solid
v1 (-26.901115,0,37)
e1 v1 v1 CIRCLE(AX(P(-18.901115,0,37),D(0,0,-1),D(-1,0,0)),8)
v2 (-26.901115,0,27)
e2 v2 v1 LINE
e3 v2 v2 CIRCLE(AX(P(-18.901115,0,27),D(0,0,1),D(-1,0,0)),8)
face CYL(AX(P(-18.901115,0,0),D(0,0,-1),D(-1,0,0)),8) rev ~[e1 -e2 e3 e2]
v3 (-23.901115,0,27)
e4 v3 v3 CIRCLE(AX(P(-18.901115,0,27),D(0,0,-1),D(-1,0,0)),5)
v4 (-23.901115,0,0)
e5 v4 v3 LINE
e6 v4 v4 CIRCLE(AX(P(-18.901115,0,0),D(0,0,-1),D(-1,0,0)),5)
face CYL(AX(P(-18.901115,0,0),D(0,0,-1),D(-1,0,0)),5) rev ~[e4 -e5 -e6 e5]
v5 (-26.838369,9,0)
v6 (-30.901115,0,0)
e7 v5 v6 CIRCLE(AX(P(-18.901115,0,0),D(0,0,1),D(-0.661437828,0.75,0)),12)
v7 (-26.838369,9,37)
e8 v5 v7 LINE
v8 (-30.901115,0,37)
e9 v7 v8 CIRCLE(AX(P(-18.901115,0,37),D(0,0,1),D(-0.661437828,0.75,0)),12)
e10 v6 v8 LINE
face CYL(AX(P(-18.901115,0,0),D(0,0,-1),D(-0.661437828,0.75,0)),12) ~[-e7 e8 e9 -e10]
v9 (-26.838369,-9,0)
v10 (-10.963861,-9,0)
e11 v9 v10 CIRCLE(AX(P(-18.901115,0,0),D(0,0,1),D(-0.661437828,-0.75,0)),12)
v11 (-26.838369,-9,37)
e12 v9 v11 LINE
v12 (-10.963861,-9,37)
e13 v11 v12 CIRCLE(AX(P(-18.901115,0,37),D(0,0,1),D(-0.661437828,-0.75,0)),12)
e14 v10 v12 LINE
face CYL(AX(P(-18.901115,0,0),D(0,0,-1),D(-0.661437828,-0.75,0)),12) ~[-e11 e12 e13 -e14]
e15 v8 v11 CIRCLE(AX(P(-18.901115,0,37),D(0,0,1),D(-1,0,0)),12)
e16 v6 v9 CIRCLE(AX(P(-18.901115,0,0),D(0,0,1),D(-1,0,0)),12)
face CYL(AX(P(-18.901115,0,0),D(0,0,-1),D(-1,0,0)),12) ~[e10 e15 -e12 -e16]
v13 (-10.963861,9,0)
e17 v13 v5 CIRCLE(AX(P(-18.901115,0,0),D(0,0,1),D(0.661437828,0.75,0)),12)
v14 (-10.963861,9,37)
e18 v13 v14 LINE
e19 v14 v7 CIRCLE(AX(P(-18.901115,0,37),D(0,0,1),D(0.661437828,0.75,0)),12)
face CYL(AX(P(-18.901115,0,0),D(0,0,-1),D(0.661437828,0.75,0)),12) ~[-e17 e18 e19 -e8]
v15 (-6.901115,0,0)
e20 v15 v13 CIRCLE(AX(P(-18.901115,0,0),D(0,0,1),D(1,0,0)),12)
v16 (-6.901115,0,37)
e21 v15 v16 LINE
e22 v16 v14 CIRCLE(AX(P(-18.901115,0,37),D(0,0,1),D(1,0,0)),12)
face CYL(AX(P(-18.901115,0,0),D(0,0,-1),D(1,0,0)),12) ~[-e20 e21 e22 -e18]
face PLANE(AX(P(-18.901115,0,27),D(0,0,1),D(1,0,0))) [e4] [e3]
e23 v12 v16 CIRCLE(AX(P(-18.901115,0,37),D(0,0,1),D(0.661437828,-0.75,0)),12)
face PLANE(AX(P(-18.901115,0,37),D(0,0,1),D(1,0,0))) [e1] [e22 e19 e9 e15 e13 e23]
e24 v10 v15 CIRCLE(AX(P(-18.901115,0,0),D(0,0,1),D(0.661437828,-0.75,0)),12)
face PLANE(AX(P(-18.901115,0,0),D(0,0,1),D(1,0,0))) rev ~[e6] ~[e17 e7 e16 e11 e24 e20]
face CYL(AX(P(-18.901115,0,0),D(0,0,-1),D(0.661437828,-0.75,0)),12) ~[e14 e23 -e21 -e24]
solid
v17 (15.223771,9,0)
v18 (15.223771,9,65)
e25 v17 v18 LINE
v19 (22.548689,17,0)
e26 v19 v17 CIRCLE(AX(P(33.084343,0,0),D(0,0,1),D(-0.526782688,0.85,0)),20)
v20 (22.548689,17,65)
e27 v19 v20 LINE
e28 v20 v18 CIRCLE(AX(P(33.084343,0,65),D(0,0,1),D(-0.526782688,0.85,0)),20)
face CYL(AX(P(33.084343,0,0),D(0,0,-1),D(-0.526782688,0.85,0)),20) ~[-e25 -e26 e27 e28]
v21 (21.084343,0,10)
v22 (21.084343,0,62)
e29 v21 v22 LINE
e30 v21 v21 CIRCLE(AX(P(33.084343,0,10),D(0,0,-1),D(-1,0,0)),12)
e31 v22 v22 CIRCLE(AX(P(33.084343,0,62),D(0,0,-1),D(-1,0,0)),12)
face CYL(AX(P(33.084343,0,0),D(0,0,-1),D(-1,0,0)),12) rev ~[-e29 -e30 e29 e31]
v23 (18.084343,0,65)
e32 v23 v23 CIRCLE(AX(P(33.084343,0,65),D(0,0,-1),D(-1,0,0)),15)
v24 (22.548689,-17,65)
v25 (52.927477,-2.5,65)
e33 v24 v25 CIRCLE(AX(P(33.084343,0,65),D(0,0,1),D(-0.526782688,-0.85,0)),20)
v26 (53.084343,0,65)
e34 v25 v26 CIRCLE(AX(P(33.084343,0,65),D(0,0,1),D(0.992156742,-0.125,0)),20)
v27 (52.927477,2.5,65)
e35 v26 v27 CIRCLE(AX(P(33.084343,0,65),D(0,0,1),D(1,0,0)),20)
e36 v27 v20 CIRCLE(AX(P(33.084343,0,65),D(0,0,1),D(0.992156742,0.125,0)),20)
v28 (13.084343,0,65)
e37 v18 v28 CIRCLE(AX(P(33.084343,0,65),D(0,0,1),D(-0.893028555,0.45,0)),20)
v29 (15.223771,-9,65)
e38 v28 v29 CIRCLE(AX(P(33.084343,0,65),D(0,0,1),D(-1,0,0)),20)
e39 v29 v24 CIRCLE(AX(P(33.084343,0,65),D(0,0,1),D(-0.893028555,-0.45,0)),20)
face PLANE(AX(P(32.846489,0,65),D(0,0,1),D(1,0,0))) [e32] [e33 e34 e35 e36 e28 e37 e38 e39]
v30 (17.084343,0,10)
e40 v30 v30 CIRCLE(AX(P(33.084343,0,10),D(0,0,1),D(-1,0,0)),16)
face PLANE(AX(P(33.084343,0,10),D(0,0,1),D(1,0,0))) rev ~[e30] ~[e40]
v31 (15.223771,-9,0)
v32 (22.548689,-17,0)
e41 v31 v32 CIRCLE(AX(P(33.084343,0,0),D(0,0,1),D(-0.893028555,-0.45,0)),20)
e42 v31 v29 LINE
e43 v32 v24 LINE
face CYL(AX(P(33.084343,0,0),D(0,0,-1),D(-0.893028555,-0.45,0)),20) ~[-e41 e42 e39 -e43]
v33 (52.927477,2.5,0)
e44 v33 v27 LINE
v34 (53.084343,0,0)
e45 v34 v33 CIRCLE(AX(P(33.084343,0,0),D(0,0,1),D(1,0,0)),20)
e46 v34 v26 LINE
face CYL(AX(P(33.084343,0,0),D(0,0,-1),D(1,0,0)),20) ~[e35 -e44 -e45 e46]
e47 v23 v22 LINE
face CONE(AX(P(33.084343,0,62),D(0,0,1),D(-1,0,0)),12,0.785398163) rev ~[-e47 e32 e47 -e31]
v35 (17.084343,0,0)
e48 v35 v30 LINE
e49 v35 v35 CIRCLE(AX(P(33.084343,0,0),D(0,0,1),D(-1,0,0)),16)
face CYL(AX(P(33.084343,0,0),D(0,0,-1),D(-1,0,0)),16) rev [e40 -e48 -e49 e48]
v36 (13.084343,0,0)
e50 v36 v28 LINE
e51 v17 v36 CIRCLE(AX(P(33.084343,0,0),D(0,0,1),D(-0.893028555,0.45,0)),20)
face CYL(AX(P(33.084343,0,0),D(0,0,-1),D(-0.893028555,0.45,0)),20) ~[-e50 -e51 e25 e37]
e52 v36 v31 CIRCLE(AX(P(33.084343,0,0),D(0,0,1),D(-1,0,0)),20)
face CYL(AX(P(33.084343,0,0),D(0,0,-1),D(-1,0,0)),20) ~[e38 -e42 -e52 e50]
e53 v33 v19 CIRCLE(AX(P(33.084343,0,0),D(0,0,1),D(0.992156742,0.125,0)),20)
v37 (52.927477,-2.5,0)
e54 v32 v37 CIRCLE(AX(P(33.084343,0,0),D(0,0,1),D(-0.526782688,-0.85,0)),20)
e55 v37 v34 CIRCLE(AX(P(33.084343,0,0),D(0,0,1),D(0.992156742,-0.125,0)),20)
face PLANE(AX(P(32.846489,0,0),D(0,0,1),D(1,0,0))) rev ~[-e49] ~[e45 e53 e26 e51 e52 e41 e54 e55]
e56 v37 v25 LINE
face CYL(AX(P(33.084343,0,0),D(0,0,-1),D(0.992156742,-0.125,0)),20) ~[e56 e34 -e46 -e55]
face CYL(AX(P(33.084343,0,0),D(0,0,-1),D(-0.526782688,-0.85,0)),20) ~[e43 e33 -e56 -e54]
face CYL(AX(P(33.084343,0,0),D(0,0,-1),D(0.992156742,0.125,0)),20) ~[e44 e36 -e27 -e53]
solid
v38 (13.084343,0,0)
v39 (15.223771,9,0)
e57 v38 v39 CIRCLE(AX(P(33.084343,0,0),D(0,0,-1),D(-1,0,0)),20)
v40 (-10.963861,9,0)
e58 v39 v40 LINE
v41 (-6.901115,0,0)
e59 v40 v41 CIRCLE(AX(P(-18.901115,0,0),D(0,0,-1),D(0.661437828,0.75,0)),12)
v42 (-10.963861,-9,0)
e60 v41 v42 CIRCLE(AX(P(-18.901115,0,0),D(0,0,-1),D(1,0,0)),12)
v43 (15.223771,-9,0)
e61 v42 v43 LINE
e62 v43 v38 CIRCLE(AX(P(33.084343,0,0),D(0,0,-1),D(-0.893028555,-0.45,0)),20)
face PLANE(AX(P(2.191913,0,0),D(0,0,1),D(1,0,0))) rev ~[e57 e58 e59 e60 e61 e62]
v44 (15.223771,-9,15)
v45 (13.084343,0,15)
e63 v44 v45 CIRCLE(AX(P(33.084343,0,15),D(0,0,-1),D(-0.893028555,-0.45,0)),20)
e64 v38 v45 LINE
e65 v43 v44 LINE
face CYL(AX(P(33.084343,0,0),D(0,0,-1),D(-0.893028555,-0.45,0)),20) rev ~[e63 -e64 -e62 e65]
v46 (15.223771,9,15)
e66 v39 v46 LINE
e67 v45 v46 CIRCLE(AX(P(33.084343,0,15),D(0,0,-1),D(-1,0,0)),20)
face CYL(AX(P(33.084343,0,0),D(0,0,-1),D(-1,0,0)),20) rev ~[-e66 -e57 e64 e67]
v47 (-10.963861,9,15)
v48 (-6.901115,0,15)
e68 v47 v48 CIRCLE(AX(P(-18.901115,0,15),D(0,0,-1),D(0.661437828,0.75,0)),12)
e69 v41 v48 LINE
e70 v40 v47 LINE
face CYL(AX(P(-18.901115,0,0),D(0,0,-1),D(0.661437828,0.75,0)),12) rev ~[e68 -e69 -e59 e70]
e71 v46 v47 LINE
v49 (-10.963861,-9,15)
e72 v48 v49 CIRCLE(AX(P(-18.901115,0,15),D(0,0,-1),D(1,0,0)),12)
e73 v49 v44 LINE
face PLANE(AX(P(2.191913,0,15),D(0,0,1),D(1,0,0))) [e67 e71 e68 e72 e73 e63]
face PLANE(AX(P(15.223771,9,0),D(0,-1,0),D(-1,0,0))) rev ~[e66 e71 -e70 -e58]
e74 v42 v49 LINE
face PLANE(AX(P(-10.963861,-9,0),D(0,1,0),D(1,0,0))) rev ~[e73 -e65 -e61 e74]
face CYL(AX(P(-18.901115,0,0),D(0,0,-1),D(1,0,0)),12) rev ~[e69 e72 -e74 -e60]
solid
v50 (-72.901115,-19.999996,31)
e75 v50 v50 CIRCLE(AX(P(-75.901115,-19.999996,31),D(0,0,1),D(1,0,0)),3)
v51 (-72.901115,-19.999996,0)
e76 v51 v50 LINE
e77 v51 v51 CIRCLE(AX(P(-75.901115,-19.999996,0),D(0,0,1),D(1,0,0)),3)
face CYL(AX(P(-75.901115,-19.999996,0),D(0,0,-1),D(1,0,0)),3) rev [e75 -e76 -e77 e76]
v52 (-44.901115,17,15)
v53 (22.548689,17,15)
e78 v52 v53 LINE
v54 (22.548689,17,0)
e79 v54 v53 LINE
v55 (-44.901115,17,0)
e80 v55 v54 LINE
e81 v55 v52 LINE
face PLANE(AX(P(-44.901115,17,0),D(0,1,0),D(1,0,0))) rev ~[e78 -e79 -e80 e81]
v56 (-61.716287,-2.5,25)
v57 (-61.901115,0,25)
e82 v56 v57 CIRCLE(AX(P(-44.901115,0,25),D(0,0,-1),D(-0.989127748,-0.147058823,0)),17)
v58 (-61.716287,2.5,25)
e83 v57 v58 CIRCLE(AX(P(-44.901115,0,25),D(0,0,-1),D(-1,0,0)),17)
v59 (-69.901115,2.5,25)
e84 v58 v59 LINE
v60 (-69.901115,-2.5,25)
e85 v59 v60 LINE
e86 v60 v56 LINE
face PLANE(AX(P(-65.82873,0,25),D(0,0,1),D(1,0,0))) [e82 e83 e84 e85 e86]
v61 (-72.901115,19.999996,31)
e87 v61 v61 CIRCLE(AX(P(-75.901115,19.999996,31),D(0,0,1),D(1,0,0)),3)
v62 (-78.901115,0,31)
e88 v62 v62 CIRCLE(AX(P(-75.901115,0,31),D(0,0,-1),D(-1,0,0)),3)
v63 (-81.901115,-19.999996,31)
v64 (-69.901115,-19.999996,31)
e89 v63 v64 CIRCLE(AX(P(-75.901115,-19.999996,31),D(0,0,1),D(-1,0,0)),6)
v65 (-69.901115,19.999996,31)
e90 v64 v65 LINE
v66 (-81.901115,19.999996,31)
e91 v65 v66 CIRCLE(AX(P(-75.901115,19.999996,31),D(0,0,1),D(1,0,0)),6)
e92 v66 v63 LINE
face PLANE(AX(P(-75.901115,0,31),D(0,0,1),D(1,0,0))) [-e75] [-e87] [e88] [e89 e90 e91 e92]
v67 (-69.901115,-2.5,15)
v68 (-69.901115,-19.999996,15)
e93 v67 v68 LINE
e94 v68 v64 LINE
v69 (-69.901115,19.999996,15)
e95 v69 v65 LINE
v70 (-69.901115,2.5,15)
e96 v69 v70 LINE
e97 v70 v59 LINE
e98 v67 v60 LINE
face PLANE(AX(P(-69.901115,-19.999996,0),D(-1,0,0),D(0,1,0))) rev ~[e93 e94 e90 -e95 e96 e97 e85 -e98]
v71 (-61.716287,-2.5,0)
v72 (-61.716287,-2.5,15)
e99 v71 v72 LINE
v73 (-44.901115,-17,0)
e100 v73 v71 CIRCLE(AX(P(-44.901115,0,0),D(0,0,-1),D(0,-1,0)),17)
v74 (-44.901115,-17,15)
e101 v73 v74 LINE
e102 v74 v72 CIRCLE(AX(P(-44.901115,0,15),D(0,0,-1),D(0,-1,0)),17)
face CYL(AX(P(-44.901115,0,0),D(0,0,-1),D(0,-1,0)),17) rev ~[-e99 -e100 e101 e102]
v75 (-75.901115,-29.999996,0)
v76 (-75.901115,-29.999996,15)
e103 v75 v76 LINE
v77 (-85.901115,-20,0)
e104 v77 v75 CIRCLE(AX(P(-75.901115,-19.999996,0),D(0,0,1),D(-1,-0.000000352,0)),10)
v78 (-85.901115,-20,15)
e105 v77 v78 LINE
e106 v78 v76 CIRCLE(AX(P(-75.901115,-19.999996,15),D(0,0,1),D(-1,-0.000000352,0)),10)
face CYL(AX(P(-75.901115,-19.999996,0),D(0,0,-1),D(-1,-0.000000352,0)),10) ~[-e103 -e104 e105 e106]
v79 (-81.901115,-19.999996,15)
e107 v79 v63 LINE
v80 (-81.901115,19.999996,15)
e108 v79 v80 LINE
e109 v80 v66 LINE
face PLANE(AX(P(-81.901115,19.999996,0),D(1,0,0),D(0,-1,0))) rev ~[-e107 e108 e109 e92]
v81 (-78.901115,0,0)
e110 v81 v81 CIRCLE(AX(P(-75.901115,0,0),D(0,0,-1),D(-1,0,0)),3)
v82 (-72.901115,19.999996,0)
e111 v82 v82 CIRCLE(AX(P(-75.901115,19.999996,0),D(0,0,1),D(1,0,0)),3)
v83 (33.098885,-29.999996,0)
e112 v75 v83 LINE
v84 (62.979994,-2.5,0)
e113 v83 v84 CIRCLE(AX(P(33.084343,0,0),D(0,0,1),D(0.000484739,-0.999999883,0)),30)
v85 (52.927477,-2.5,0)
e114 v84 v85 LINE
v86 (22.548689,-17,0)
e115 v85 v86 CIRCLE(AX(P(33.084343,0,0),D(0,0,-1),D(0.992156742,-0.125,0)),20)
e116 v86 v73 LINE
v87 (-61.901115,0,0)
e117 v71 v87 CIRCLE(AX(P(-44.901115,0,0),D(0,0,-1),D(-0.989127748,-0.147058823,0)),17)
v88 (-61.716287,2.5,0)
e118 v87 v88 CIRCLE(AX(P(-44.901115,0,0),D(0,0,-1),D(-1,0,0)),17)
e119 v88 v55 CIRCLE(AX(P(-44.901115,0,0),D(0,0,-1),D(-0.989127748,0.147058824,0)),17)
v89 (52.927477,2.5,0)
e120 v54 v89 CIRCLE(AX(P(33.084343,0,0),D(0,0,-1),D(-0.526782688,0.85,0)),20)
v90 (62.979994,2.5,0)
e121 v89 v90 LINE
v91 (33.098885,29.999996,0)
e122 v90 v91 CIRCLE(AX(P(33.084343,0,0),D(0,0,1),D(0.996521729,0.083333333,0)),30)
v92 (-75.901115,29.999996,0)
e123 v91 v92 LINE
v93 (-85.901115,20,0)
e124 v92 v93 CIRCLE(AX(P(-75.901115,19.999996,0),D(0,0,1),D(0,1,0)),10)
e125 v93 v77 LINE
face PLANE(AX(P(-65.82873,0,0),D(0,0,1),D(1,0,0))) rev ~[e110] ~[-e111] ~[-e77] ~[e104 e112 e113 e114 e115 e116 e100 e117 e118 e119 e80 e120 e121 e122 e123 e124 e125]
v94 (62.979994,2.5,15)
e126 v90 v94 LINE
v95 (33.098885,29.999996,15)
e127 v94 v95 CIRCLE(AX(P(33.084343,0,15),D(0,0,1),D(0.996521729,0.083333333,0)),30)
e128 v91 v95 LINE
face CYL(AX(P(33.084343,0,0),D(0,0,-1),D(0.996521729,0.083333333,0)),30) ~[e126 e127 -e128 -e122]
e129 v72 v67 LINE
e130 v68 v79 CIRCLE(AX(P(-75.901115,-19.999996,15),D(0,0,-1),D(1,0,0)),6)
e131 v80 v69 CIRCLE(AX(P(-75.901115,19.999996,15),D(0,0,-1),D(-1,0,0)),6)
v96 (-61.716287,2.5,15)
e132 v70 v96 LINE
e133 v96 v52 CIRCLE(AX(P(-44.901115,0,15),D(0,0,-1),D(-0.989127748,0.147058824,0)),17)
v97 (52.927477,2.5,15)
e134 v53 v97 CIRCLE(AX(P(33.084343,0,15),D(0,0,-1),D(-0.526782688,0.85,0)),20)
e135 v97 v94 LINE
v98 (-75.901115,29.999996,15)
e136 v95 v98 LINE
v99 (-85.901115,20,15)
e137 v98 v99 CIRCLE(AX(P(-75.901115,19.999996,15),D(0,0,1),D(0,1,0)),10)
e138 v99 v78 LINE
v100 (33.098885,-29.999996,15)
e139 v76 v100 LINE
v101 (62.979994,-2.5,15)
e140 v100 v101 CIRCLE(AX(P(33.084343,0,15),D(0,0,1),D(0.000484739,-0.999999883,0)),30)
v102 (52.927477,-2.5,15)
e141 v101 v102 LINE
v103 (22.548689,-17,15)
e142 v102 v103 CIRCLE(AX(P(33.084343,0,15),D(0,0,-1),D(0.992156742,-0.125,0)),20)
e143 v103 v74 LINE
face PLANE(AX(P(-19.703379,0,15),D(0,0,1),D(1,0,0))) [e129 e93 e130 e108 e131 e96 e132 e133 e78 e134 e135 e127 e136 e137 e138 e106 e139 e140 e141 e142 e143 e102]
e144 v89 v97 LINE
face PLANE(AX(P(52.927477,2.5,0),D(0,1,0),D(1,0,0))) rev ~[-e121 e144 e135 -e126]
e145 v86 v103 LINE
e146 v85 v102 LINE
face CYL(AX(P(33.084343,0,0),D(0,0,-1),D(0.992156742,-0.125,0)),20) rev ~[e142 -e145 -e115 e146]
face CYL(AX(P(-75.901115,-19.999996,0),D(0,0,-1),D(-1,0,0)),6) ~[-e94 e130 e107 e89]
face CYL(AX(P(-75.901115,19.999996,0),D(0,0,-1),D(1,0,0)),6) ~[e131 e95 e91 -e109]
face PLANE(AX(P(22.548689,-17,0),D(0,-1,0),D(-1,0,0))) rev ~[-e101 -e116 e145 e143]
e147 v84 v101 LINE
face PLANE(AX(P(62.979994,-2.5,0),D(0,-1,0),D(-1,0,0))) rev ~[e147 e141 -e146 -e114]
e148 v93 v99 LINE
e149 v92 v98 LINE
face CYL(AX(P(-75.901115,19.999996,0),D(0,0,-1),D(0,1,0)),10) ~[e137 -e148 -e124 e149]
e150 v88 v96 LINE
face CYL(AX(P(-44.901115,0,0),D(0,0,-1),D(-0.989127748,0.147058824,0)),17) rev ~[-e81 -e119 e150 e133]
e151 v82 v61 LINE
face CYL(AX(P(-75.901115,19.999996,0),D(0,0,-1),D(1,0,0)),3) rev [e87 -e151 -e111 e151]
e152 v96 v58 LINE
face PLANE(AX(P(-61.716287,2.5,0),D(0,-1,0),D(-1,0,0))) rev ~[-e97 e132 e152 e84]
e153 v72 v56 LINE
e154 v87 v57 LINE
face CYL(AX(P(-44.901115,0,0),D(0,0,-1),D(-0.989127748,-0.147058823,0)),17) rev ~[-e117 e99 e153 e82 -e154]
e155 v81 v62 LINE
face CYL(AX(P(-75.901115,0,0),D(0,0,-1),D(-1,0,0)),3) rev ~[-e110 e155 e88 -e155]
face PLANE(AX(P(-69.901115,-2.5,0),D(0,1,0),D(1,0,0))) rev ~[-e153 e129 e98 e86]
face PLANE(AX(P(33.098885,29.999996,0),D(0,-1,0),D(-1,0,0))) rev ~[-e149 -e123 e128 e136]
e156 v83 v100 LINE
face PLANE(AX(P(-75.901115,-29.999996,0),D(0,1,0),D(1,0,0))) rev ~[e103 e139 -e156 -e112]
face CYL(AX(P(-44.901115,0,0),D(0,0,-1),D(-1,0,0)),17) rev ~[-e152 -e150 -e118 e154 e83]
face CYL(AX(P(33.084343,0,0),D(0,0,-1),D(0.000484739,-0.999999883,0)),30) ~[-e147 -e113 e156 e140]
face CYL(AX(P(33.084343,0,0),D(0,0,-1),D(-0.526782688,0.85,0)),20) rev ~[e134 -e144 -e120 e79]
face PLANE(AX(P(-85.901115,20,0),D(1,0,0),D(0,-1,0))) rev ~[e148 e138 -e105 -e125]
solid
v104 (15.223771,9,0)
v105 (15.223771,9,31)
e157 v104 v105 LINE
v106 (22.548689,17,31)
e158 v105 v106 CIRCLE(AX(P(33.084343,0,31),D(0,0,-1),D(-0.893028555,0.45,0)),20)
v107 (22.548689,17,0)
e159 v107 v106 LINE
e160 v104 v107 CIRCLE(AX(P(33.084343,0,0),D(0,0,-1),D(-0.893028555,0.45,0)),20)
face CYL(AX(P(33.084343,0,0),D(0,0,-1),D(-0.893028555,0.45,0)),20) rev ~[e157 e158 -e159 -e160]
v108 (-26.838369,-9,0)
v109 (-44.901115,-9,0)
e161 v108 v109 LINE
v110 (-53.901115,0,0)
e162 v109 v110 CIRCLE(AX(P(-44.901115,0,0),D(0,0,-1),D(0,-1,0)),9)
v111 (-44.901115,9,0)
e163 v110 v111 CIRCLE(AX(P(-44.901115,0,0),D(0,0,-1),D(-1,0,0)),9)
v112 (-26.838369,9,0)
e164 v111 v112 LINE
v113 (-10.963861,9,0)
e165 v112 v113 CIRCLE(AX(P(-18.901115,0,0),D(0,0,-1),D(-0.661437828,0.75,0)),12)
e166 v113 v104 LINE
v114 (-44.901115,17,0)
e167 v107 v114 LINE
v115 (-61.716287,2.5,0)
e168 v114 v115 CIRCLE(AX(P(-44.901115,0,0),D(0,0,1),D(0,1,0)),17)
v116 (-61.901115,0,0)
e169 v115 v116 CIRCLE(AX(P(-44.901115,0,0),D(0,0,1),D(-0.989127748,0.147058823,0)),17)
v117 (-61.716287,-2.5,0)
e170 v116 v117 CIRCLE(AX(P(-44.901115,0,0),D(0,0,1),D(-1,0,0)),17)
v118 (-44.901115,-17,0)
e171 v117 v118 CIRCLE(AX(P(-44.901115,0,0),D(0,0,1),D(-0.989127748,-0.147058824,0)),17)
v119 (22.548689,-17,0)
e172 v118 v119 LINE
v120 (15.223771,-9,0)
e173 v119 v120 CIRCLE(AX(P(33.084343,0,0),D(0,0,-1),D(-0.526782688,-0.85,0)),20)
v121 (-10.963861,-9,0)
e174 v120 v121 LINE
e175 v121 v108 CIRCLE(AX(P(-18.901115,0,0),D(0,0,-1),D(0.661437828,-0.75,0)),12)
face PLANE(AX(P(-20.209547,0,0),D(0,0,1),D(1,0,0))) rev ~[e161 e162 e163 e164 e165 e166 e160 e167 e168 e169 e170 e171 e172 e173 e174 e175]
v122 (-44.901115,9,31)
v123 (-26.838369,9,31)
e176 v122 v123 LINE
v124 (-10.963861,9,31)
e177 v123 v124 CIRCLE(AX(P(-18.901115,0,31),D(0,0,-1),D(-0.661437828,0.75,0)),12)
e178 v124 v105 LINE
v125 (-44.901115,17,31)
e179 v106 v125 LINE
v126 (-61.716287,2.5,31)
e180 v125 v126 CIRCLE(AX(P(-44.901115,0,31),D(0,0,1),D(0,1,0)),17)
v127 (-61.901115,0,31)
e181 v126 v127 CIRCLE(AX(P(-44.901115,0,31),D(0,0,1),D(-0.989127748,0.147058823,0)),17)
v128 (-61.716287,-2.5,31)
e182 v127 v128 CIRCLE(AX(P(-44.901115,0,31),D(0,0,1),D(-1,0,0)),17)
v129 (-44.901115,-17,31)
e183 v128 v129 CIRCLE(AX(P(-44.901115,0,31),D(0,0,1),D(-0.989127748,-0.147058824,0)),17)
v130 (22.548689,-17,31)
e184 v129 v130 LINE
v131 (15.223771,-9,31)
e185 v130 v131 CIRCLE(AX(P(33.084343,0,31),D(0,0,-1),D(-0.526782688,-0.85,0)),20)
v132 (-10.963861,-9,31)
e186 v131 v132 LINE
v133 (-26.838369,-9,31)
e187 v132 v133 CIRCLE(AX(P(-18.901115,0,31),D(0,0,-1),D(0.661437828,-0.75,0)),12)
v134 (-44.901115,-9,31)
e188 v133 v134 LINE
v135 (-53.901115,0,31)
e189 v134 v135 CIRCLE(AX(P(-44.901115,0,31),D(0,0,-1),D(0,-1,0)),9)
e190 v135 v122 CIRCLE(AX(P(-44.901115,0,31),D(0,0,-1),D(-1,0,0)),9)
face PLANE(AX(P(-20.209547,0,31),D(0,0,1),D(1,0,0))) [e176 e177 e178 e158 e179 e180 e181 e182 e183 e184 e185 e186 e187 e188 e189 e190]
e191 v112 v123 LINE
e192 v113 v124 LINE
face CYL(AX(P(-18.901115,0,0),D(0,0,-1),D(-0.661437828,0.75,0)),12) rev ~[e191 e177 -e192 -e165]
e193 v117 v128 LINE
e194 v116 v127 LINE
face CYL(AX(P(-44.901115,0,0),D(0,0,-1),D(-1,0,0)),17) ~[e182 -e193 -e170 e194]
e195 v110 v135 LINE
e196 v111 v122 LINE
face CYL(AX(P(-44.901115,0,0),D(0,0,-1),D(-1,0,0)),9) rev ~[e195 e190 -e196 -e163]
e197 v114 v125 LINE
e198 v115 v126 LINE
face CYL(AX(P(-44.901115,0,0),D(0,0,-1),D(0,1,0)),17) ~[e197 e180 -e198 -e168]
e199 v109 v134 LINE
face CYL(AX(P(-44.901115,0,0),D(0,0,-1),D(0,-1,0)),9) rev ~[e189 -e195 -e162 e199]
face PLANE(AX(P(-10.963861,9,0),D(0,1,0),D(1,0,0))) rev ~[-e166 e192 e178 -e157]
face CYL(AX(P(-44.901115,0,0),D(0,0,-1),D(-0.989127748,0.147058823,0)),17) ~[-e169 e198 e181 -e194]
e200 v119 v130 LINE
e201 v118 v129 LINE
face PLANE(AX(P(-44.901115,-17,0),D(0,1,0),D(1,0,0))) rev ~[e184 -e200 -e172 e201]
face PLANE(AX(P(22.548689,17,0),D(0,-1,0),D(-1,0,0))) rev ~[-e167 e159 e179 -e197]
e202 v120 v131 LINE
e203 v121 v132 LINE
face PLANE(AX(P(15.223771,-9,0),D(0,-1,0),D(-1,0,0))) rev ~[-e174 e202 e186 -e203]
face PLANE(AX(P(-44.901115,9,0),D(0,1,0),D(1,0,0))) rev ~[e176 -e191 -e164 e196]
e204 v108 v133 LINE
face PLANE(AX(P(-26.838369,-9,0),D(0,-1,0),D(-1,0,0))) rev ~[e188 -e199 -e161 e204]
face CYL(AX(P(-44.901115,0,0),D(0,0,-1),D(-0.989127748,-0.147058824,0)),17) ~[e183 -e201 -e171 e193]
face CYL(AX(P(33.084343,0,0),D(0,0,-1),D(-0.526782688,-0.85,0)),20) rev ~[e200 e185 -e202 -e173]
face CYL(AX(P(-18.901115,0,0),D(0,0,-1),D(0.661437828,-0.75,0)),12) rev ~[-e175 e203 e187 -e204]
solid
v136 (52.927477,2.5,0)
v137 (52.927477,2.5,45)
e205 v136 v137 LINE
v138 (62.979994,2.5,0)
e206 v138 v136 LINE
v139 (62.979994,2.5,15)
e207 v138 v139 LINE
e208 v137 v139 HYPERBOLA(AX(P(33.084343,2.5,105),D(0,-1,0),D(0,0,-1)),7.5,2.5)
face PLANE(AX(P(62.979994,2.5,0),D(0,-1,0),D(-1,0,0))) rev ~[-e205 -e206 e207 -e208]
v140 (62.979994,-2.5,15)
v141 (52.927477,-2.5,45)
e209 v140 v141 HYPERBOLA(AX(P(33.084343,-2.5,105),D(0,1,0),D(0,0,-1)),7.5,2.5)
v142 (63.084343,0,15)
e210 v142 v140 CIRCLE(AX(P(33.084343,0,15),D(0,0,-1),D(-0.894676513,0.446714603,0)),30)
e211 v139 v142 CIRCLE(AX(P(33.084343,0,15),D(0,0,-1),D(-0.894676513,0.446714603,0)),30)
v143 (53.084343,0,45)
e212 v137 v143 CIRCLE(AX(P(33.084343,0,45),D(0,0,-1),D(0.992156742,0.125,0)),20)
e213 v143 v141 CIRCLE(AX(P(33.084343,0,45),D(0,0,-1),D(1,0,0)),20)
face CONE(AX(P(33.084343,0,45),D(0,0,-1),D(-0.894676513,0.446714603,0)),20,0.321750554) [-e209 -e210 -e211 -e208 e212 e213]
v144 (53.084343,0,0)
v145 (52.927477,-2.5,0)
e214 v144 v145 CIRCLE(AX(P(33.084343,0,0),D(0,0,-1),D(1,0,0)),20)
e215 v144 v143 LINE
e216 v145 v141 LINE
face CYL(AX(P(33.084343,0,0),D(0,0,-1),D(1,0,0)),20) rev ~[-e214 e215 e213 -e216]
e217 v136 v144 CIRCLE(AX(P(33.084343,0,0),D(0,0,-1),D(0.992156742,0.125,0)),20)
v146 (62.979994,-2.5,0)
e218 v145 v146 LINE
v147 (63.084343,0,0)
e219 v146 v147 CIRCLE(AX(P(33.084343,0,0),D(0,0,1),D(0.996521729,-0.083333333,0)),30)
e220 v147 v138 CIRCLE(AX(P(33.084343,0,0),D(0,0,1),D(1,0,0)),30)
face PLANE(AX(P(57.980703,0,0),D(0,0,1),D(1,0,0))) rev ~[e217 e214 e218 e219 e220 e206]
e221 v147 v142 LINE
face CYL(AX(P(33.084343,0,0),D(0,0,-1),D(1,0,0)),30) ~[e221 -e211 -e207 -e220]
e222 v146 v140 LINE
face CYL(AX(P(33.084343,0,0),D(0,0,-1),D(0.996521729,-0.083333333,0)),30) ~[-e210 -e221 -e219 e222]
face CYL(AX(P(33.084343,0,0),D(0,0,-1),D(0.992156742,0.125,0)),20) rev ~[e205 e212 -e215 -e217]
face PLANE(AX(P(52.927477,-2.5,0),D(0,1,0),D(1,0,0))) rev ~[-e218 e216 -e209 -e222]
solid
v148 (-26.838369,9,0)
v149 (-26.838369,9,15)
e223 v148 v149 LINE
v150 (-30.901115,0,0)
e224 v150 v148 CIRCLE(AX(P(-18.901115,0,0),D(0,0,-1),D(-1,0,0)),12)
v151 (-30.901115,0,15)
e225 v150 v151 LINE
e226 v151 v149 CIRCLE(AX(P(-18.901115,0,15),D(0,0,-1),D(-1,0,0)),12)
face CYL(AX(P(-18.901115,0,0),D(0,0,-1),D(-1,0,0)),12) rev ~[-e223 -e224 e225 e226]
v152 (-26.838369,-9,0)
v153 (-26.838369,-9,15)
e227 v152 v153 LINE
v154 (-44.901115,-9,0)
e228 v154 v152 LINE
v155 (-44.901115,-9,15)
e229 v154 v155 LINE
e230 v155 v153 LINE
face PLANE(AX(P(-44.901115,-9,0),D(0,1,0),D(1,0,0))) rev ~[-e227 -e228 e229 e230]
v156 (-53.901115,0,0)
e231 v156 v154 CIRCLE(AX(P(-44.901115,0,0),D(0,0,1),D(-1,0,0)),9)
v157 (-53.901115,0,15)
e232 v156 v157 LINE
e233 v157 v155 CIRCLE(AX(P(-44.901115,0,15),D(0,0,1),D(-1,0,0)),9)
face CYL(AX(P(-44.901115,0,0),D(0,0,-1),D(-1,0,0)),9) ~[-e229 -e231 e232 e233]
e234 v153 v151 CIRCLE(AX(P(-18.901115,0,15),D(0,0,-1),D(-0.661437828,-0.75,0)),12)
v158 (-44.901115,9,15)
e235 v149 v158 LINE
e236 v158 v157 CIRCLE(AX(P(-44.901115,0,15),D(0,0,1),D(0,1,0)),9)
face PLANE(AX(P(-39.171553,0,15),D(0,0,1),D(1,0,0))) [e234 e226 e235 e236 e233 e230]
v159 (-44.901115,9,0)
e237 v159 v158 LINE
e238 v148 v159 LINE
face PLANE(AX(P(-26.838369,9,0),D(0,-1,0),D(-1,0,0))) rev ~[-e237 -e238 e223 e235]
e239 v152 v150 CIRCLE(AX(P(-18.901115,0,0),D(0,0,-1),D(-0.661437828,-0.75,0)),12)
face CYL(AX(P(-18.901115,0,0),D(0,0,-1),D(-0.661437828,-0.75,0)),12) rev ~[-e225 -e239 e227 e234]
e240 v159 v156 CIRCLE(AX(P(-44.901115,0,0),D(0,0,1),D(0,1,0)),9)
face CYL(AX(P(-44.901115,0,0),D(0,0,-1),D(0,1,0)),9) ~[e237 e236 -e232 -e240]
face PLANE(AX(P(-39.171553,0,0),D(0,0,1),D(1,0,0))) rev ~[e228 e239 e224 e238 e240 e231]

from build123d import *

# Parameters (mm, degrees)
F1_DEPTH     = 15
F0_R         = 3
F2_DEPTH     = 31
F3_DEPTH     = 25
F4_DEPTH     = 31
F5_DEPTH     = 37
F6_DEPTH     = 27
F7_DEPTH     = 65
F8_DEPTH     = 10
F9_SIZE2     = 3
F9_SIZE      = 3
F10_DEPTH    = 45
F11_T2_ANGLE = 306.9338182571


# Not quite as in the source:
# - a fillet or chamfer that OpenCascade refuses, or shapes differently, is made with other operations: its cross-section is extruded or revolved along the edge and cut away or added


with BuildPart() as f1:
    # F0 (on Top) → F1 (new body)
    with BuildSketch(Plane.XY):
        with BuildLine():
            Line((-85.9011153158, 20), (-85.9011153158, 0))
            Line((-85.9011153158, 0), (-85.9011153158, -20))
            ThreePointArc((-85.9011153158, -20), (-82.9721818815, -27.0710655334), (-75.9011153158, -29.9999964754))
            Line((-75.9011153158, -29.9999964754), (33.0988846842, -29.9999964754))
            ThreePointArc((33.0988846842, -29.9999964754), (53.399789309, -22.0744789725), (62.9799943814, -2.5))
            Line((62.9799943814, -2.5), (52.9274773566, -2.5))
            ThreePointArc((52.9274773566, -2.5), (41.6994339923, -18.0493822328), (22.5486887708, -17))
            Line((22.5486887708, -17), (-44.9011153158, -17))
            ThreePointArc((-44.9011153158, -17), (-56.0029169714, -12.8743931896), (-61.7162870366, -2.5))
            Line((-61.7162870366, -2.5), (-69.9011153158, -2.5))
            Line((-69.9011153158, -2.5), (-69.9011153158, -19.9999964754))
            ThreePointArc((-69.9011153158, -19.9999964754), (-75.9011153158, -25.9999964754), (-81.9011153158, -19.9999964754))
            Line((-81.9011153158, -19.9999964754), (-81.9011153158, 0))
            Line((-81.9011153158, 0), (-81.9011153158, 19.9999964754))
            ThreePointArc((-81.9011153158, 19.9999964754), (-75.9011153158, 25.9999964754), (-69.9011153158, 19.9999964754))
            Line((-69.9011153158, 19.9999964754), (-69.9011153158, 2.5))
            Line((-69.9011153158, 2.5), (-61.7162870366, 2.5))
            ThreePointArc((-61.7162870366, 2.5), (-56.0029169714, 12.8743931896), (-44.9011153158, 17))
            Line((-44.9011153158, 17), (22.5486887708, 17))
            ThreePointArc((22.5486887708, 17), (41.6994339923, 18.0493822328), (52.9274773566, 2.5))
            Line((52.9274773566, 2.5), (62.9799943814, 2.5))
            ThreePointArc((62.9799943814, 2.5), (53.399789309, 22.0744789725), (33.0988846842, 29.9999964754))
            Line((33.0988846842, 29.9999964754), (-75.9011153158, 29.9999964754))
            ThreePointArc((-75.9011153158, 29.9999964754), (-82.9721818815, 27.0710655334), (-85.9011153158, 20))
        make_face()
    extrude(amount=F1_DEPTH)

    # F0 (on Top) → F2 (join)
    with BuildSketch(Plane.XY):
        with BuildLine():
            Line((-69.9011153158, -19.9999964754), (-69.9011153158, -2.5))
            Line((-69.9011153158, -2.5), (-69.9011153158, 0))
            Line((-69.9011153158, 0), (-69.9011153158, 2.5))
            Line((-69.9011153158, 2.5), (-69.9011153158, 19.9999964754))
            ThreePointArc((-69.9011153158, 19.9999964754), (-75.9011153158, 25.9999964754), (-81.9011153158, 19.9999964754))
            Line((-81.9011153158, 19.9999964754), (-81.9011153158, 0))
            Line((-81.9011153158, 0), (-81.9011153158, -19.9999964754))
            ThreePointArc((-81.9011153158, -19.9999964754), (-75.9011153158, -25.9999964754), (-69.9011153158, -19.9999964754))
        make_face()
        with Locations((-75.9011153158, -19.9999964754)):
            Circle(F0_R, mode=Mode.SUBTRACT)
        with BuildLine():
            ThreePointArc((-72.9011153158, 0), (-75.9011153158, -3), (-78.9011153158, 0))
            ThreePointArc((-78.9011153158, 0), (-75.9011153158, 3), (-72.9011153158, 0))
        make_face(mode=Mode.SUBTRACT)
        with Locations((-75.9011153158, 19.9999964754)):
            Circle(F0_R, mode=Mode.SUBTRACT)
    extrude(amount=F2_DEPTH)

    # F0 (on Top) → F3 (join)
    with BuildSketch(Plane.XY):
        with BuildLine():
            Line((-69.9011153158, -2.5), (-61.7162870366, -2.5))
            ThreePointArc((-61.7162870366, -2.5), (-61.8548452778, -1.253411494), (-61.9011153158, 0))
            ThreePointArc((-61.9011153158, 0), (-61.8548452778, 1.253411494), (-61.7162870366, 2.5))
            Line((-61.7162870366, 2.5), (-69.9011153158, 2.5))
            Line((-69.9011153158, 2.5), (-69.9011153158, 0))
            Line((-69.9011153158, 0), (-69.9011153158, -2.5))
        make_face()
    extrude(amount=F3_DEPTH)


with BuildPart() as f1b:
    # F0 (on Top) → F1, piece 2 (new body)
    with BuildSketch(Plane.XY):
        with BuildLine():
            Line((-44.9011153158, -9), (-26.838369249, -9))
            ThreePointArc((-26.838369249, -9), (-29.838369249, -4.9372539332), (-30.9011153158, 0))
            ThreePointArc((-30.9011153158, 0), (-29.838369249, 4.9372539332), (-26.838369249, 9))
            Line((-26.838369249, 9), (-44.9011153158, 9))
            ThreePointArc((-44.9011153158, 9), (-51.2650763465, 6.3639610307), (-53.9011153158, 0))
            ThreePointArc((-53.9011153158, 0), (-51.2650763465, -6.3639610307), (-44.9011153158, -9))
        make_face()
    extrude(amount=F1_DEPTH)


with BuildPart() as f1c:
    # F0 (on Top) → F1, piece 3 (new body)
    with BuildSketch(Plane.XY):
        with BuildLine():
            Line((-10.9638613826, -9), (15.2237714241, -9))
            ThreePointArc((15.2237714241, -9), (13.6265494577, -4.6253960917), (13.0843425236, 0))
            ThreePointArc((13.0843425236, 0), (13.6265494577, 4.6253960917), (15.2237714241, 9))
            Line((15.2237714241, 9), (-10.9638613826, 9))
            ThreePointArc((-10.9638613826, 9), (-7.9638613826, 4.9372539332), (-6.9011153158, 0))
            ThreePointArc((-6.9011153158, 0), (-7.9638613826, -4.9372539332), (-10.9638613826, -9))
        make_face()
    extrude(amount=F1_DEPTH)


with BuildPart() as f4:
    # F0 (on Top) → F4 (new body)
    with BuildSketch(Plane.XY):
        with BuildLine():
            Line((-44.9011153158, -17), (22.5486887708, -17))
            ThreePointArc((22.5486887708, -17), (18.3335324962, -13.5060580309), (15.2237714241, -9))
            Line((15.2237714241, -9), (-10.9638613826, -9))
            ThreePointArc((-10.9638613826, -9), (-18.9011153158, -12), (-26.838369249, -9))
            Line((-26.838369249, -9), (-44.9011153158, -9))
            ThreePointArc((-44.9011153158, -9), (-51.2650763465, -6.3639610307), (-53.9011153158, 0))
            ThreePointArc((-53.9011153158, 0), (-51.2650763465, 6.3639610307), (-44.9011153158, 9))
            Line((-44.9011153158, 9), (-26.838369249, 9))
            ThreePointArc((-26.838369249, 9), (-18.9011153158, 12), (-10.9638613826, 9))
            Line((-10.9638613826, 9), (15.2237714241, 9))
            ThreePointArc((15.2237714241, 9), (18.3335324962, 13.5060580309), (22.5486887708, 17))
            Line((22.5486887708, 17), (-44.9011153158, 17))
            ThreePointArc((-44.9011153158, 17), (-56.0029169714, 12.8743931896), (-61.7162870366, 2.5))
            ThreePointArc((-61.7162870366, 2.5), (-61.8548452778, 1.253411494), (-61.9011153158, 0))
            ThreePointArc((-61.9011153158, 0), (-61.8548452778, -1.253411494), (-61.7162870366, -2.5))
            ThreePointArc((-61.7162870366, -2.5), (-56.0029169714, -12.8743931896), (-44.9011153158, -17))
        make_face()
    extrude(amount=F4_DEPTH)


with BuildPart() as f5:
    # F0 (on Top) → F5 (new body)
    with BuildSketch(Plane.XY):
        with BuildLine():
            ThreePointArc((-26.838369249, -9), (-18.9011153158, -12), (-10.9638613826, -9))
            ThreePointArc((-10.9638613826, -9), (-7.9638613826, -4.9372539332), (-6.9011153158, 0))
            ThreePointArc((-6.9011153158, 0), (-7.9638613826, 4.9372539332), (-10.9638613826, 9))
            ThreePointArc((-10.9638613826, 9), (-18.9011153158, 12), (-26.838369249, 9))
            ThreePointArc((-26.838369249, 9), (-29.838369249, 4.9372539332), (-30.9011153158, 0))
            ThreePointArc((-30.9011153158, 0), (-29.838369249, -4.9372539332), (-26.838369249, -9))
        make_face()
        with BuildLine():
            ThreePointArc((-10.9011153158, 0), (-18.9011153158, -8), (-26.9011153158, 0))
            ThreePointArc((-26.9011153158, 0), (-18.9011153158, 8), (-10.9011153158, 0))
        make_face(mode=Mode.SUBTRACT)
    extrude(amount=F5_DEPTH)

    # F0 (on Top) → F6 (join)
    with BuildSketch(Plane.XY):
        with BuildLine():
            ThreePointArc((-10.9011153158, 0), (-18.9011153158, 8), (-26.9011153158, 0))
            ThreePointArc((-26.9011153158, 0), (-18.9011153158, -8), (-10.9011153158, 0))
        make_face()
        with BuildLine():
            ThreePointArc((-13.9011153158, 0), (-18.9011153158, -5), (-23.9011153158, 0))
            ThreePointArc((-23.9011153158, 0), (-18.9011153158, 5), (-13.9011153158, 0))
        make_face(mode=Mode.SUBTRACT)
    extrude(amount=F6_DEPTH)


with BuildPart() as f7:
    # F0 (on Top) → F7 (new body)
    with BuildSketch(Plane.XY):
        with BuildLine():
            ThreePointArc((22.5486887708, -17), (41.6994339923, -18.0493822328), (52.9274773566, -2.5))
            ThreePointArc((52.9274773566, -2.5), (53.0450877084, -1.2524582509), (53.0843425236, 0))
            ThreePointArc((53.0843425236, 0), (53.0450877084, 1.2524582509), (52.9274773566, 2.5))
            ThreePointArc((52.9274773566, 2.5), (41.6994339923, 18.0493822328), (22.5486887708, 17))
            ThreePointArc((22.5486887708, 17), (18.3335324962, 13.5060580309), (15.2237714241, 9))
            ThreePointArc((15.2237714241, 9), (13.6265494577, 4.6253960917), (13.0843425236, 0))
            ThreePointArc((13.0843425236, 0), (13.6265494577, -4.6253960917), (15.2237714241, -9))
            ThreePointArc((15.2237714241, -9), (18.3335324962, -13.5060580309), (22.5486887708, -17))
        make_face()
        with BuildLine():
            ThreePointArc((49.0843425236, 0), (33.0843425236, -16), (17.0843425236, 0))
            ThreePointArc((17.0843425236, 0), (33.0843425236, 16), (49.0843425236, 0))
        make_face(mode=Mode.SUBTRACT)
        with BuildLine():
            ThreePointArc((49.0843425236, 0), (33.0843425236, 16), (17.0843425236, 0))
            ThreePointArc((17.0843425236, 0), (33.0843425236, -16), (49.0843425236, 0))
        make_face()
        with BuildLine():
            ThreePointArc((45.0843425236, 0), (33.0843425236, -12), (21.0843425236, 0))
            ThreePointArc((21.0843425236, 0), (33.0843425236, 12), (45.0843425236, 0))
        make_face(mode=Mode.SUBTRACT)
    extrude(amount=F7_DEPTH)

    # F0 (on Top) → F8 (cut)
    with BuildSketch(Plane.XY):
        with BuildLine():
            ThreePointArc((49.0843425236, 0), (33.0843425236, 16), (17.0843425236, 0))
            ThreePointArc((17.0843425236, 0), (33.0843425236, -16), (49.0843425236, 0))
        make_face()
        with BuildLine():
            ThreePointArc((45.0843425236, 0), (33.0843425236, -12), (21.0843425236, 0))
            ThreePointArc((21.0843425236, 0), (33.0843425236, 12), (45.0843425236, 0))
        make_face(mode=Mode.SUBTRACT)
    extrude(amount=F8_DEPTH, mode=Mode.SUBTRACT)

    # F9
    f9_edges = [f7.edges().sort_by_distance(p)[0] for p in [
        (45.084343, 0, 65),
    ]]
    chamfer(f9_edges, length=F9_SIZE, length2=F9_SIZE2)


with BuildPart() as f10:
    # F0 (on Top) → F10 (new body)
    with BuildSketch(Plane.XY):
        with BuildLine():
            Line((52.9274773566, -2.5), (62.9799943814, -2.5))
            ThreePointArc((62.9799943814, -2.5), (63.058244136, -1.2510883797), (63.0843425236, 0))
            ThreePointArc((63.0843425236, 0), (63.058244136, 1.2510883797), (62.9799943814, 2.5))
            Line((62.9799943814, 2.5), (52.9274773566, 2.5))
            ThreePointArc((52.9274773566, 2.5), (53.0450877084, 1.2524582509), (53.0843425236, 0))
            ThreePointArc((53.0843425236, 0), (53.0450877084, -1.2524582509), (52.9274773566, -2.5))
        make_face()
    extrude(amount=F10_DEPTH)

    # F11: chamfer of 10 x 30 on 1 edges, made by hand

    # F11_s1 → F11_t2 (revolve, cut)
    with BuildSketch(Plane(origin=(6.6021107949, 13.2226558591, 0), x_dir=(0, 0, 1), z_dir=(-0.4467146032, -0.8946765132, 0))):
        Polygon((45, -9.5997842104), (15, 0.4002157896), (45, 0.4002157896), align=None)
    revolve(axis=Axis((33.0843425236, 0, 45), (0, 0, -1)), revolution_arc=F11_T2_ANGLE, mode=Mode.SUBTRACT)


solid = Compound([f1.part, f1b.part, f1c.part, f4.part, f5.part, f7.part, f10.part])
